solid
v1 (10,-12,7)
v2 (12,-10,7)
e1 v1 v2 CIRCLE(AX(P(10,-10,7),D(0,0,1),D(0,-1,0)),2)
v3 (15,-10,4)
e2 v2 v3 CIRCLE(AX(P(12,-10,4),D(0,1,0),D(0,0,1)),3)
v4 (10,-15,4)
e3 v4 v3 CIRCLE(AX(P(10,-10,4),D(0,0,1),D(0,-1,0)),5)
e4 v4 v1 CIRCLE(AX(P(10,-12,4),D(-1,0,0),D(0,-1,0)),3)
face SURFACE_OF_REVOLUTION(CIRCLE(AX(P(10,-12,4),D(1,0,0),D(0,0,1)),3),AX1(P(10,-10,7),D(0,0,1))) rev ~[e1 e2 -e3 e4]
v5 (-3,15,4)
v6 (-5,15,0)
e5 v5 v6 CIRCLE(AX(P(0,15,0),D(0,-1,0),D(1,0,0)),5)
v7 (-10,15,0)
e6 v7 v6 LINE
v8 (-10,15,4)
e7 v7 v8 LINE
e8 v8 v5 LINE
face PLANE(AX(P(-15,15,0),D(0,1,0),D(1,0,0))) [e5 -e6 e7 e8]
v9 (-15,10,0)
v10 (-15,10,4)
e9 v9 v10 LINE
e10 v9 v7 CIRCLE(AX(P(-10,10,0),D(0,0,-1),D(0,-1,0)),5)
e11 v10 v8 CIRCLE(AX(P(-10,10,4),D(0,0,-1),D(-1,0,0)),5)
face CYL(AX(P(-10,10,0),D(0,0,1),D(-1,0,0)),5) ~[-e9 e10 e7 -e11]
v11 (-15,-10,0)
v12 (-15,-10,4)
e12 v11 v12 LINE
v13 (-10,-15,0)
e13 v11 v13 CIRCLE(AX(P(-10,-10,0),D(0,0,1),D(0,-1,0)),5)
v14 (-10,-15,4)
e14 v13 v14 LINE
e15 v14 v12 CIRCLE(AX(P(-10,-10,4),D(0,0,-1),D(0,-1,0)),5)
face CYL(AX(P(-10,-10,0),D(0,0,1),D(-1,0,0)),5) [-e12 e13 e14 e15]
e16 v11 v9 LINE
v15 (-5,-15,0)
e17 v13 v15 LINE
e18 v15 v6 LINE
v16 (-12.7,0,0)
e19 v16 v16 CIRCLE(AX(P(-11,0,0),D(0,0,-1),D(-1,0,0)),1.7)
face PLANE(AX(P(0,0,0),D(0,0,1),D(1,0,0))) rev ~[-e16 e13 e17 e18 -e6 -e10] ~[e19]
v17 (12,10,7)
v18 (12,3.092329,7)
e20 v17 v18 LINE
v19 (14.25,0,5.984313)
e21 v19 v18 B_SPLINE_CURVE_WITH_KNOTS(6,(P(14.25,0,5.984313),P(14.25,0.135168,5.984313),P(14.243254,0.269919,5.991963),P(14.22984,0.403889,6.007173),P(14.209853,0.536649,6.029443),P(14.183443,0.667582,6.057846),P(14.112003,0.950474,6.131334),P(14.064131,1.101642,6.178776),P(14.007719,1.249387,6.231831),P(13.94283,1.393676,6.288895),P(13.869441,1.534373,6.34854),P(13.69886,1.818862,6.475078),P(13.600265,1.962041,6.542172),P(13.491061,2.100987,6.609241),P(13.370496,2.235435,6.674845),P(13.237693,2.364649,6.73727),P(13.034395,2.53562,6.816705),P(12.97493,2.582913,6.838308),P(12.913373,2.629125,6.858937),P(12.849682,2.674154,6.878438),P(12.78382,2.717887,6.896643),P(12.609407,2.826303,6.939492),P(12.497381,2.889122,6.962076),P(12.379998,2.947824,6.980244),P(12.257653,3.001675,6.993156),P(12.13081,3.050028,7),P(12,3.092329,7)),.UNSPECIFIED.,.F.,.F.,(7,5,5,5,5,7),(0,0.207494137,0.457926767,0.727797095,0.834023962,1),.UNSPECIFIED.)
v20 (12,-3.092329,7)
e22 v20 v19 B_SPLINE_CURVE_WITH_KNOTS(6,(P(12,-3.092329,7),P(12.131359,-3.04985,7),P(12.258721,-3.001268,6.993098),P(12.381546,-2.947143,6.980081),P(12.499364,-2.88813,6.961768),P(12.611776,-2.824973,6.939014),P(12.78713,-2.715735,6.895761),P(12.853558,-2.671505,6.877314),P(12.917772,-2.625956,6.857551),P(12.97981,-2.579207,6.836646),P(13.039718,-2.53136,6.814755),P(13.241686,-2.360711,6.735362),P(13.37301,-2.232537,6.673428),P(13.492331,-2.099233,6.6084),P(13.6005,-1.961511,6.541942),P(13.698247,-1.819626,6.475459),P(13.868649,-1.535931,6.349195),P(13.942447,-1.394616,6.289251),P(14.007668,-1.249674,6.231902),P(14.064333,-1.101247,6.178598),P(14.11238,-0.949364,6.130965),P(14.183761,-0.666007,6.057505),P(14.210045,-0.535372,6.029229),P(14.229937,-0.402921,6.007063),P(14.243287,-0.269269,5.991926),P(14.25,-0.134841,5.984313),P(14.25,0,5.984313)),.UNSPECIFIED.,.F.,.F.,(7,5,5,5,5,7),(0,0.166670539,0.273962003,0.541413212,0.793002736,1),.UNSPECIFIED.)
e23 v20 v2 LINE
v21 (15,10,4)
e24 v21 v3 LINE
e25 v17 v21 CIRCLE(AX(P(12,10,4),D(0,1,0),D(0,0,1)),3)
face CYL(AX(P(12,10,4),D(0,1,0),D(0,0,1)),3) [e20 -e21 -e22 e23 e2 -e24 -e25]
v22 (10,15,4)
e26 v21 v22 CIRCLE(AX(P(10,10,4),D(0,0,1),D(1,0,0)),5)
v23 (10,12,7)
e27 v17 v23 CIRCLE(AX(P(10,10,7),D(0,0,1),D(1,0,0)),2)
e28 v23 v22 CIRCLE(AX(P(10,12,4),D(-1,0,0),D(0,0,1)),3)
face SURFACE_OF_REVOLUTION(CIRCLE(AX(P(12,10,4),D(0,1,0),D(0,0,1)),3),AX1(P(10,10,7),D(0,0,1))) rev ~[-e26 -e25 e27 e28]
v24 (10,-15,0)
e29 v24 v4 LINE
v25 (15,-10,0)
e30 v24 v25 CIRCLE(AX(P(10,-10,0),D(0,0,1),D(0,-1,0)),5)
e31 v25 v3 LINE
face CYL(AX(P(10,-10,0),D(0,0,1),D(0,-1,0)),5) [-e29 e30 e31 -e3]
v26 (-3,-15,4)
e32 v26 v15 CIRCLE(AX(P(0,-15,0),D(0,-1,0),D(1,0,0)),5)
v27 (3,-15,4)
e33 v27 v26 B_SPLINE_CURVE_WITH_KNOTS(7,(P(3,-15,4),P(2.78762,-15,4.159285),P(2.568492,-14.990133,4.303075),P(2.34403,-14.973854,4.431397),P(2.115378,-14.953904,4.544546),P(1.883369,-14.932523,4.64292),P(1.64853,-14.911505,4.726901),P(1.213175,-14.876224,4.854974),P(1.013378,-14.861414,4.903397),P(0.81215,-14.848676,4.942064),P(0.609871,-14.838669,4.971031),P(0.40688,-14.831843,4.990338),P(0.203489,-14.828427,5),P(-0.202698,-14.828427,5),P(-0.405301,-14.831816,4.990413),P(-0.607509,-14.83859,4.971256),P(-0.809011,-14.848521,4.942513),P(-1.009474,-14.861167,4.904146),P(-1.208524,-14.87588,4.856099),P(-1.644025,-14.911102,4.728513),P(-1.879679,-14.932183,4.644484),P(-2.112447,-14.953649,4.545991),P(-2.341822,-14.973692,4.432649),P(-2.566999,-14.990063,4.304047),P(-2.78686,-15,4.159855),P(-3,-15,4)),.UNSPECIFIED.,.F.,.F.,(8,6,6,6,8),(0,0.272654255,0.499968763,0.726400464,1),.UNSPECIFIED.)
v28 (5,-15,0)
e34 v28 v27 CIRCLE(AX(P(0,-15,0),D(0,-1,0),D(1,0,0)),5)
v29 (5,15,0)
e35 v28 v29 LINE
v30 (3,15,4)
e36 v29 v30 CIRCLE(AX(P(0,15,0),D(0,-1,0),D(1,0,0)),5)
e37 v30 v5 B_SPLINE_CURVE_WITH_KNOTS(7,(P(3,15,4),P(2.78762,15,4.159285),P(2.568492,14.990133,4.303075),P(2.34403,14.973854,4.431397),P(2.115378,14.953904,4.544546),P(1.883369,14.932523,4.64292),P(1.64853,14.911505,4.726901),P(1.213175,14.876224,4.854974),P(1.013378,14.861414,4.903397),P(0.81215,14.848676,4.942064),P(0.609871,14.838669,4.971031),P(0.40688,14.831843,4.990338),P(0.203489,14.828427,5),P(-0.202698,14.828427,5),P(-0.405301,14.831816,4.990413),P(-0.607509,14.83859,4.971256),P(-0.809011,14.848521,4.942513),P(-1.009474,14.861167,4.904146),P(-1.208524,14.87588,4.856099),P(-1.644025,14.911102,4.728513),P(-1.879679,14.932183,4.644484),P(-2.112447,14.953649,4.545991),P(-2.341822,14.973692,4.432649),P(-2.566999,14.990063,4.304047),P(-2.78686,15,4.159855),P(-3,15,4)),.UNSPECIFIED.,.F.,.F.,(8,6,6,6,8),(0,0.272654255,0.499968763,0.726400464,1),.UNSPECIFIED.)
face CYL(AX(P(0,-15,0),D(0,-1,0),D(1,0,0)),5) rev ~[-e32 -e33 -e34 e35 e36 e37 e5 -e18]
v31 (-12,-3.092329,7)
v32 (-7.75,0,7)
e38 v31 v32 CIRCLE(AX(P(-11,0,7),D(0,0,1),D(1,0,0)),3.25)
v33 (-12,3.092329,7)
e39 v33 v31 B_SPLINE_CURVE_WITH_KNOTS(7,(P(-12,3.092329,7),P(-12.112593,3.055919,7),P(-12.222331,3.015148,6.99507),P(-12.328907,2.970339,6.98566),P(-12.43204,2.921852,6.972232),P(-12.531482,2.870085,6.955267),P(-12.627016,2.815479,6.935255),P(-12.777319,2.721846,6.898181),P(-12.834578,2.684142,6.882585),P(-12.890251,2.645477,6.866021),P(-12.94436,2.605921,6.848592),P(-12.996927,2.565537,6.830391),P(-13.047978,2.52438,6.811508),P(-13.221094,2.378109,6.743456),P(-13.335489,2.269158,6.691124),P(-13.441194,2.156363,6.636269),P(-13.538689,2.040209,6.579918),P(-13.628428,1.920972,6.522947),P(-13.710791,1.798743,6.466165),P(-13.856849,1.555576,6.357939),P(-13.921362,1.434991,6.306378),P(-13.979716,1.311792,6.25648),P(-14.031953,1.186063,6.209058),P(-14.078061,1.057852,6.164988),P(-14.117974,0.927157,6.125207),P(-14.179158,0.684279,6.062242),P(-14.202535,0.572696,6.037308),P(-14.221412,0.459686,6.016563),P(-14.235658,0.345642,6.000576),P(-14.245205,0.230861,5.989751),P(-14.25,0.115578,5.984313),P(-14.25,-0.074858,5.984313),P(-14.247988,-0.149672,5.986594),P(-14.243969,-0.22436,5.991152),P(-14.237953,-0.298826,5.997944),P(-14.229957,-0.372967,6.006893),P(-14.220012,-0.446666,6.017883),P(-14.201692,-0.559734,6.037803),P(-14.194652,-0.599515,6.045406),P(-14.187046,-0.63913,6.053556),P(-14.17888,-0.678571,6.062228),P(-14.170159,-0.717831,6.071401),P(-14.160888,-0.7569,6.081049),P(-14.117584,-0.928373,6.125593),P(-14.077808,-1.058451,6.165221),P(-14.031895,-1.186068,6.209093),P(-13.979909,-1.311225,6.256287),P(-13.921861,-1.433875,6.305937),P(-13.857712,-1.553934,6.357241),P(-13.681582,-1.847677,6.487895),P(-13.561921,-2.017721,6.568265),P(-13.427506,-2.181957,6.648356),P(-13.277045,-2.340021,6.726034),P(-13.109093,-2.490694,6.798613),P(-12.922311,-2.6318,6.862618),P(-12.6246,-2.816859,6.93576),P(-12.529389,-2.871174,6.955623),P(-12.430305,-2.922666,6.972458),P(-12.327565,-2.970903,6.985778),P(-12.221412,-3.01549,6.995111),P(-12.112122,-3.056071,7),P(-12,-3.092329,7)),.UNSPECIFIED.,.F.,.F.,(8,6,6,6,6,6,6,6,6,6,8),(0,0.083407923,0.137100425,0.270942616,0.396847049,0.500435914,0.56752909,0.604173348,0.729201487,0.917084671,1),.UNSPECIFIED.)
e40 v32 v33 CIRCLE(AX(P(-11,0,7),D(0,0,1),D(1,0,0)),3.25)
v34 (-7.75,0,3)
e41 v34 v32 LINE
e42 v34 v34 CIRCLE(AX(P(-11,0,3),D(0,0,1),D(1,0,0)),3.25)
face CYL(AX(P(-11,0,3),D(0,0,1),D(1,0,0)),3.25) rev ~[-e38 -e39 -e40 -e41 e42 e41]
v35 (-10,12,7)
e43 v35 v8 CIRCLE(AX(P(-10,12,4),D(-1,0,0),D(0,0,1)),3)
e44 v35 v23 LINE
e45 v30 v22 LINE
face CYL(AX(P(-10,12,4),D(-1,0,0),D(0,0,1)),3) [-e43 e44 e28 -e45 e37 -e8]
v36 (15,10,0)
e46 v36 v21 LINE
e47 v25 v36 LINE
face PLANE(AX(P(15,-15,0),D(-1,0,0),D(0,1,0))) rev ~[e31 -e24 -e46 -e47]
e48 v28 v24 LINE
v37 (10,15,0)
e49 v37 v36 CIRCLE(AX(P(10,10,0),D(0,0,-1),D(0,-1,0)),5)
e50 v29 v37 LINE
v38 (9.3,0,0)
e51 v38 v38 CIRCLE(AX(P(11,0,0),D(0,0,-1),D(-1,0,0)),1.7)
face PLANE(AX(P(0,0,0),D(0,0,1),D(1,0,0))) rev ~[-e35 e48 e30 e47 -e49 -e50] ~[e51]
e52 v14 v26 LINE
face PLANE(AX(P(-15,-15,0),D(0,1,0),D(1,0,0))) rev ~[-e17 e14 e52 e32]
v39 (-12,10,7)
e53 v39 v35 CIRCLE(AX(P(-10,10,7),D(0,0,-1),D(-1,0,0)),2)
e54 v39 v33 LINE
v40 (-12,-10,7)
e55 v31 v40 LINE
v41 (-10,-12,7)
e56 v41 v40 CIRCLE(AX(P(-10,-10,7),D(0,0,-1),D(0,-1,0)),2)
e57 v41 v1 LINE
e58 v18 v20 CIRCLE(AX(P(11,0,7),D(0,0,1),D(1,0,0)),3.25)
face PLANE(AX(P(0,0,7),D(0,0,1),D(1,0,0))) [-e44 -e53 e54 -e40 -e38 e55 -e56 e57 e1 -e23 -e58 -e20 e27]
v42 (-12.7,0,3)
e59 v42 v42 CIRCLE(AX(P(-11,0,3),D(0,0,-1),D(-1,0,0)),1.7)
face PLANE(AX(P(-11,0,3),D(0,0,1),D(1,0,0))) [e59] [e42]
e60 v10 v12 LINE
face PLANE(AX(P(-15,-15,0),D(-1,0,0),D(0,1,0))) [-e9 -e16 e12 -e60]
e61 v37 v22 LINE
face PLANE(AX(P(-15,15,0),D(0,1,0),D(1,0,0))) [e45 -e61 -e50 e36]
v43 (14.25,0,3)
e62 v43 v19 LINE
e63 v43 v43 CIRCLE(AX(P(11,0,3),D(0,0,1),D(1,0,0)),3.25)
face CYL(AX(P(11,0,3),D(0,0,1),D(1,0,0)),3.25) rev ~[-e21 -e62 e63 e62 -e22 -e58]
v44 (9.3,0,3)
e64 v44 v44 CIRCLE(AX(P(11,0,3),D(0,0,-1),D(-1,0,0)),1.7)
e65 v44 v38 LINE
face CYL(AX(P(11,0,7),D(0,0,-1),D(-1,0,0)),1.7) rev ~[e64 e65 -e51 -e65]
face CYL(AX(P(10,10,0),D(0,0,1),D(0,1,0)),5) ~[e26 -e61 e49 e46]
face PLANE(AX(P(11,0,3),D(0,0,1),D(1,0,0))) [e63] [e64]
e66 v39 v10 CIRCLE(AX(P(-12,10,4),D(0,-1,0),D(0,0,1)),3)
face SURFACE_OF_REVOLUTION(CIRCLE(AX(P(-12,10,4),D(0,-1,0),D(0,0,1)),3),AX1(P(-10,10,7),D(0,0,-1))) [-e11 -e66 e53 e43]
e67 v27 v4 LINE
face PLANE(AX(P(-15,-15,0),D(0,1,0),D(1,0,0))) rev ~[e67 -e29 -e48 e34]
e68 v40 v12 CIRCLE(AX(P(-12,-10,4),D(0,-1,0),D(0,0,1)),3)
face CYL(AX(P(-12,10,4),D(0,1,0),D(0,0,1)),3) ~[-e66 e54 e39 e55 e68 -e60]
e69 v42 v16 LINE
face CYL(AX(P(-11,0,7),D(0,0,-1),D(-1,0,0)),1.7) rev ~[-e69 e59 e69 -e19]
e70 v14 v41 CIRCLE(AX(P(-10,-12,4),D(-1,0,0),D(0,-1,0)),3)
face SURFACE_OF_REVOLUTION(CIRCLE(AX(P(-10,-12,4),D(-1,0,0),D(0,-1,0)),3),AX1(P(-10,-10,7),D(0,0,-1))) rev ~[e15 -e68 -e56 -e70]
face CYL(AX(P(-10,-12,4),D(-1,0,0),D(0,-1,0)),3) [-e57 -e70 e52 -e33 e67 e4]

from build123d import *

# Parameters (mm, degrees)
F0_W           = 30
F0_H           = 30
F1_DEPTH       = 7
F3_D           = 3.4
F3_CBORE_D     = 6.5
F3_CBORE_DEPTH = 4
F5_DEPTH       = 30
F6_R           = 5
F7_T1_DEPTH    = 20
F7_T3_DEPTH    = 20
F7_T6_ANGLE    = 90
F7_T8_ANGLE    = 90
F7_T10_ANGLE   = 90
F7_T12_ANGLE   = 90


# Not quite as in the source:
# - a fillet or chamfer that OpenCascade refuses, or shapes differently, is made with other operations: its cross-section is extruded or revolved along the edge and cut away or added


with BuildPart() as f1:
    # F0 (on Top) → F1 (new body)
    with BuildSketch(Plane.XY):
        Rectangle(F0_W, F0_H)
    extrude(amount=F1_DEPTH)

    # F3 (through all)
    with Locations(Plane.XY.offset(7)):
        with Locations((-11, 0), (11, 0)):
            CounterBoreHole(F3_D / 2, F3_CBORE_D / 2, F3_CBORE_DEPTH)

    # F4 (on face) → F5 (cut, through all)
    with BuildSketch(Plane.XZ.offset(15)):
        with BuildLine():
            Line((-5, 0), (5, 0))
            ThreePointArc((5, 0), (0, 5), (-5, 0))
        make_face()
    extrude(amount=-F5_DEPTH, mode=Mode.SUBTRACT)

    # F6
    f6_edges = [f1.edges().sort_by_distance(p)[0] for p in [
        (15, -15, 3.5),
        (-15, -15, 3.5),
        (15, 15, 3.5),
        (-15, 15, 3.5),
    ]]
    fillet(f6_edges, radius=F6_R)

    # F7: fillet of radius 3 on 8 edges, made by hand

    # F7_s2 → F7_t1 (cut)
    with BuildSketch(Plane.YZ.offset(-10)):
        with BuildLine():
            ThreePointArc((-15, 4), (-14.1213203436, 6.1213203436), (-12, 7))
            Line((-12, 7), (-15, 7))
            Line((-15, 7), (-15, 4))
        make_face()
        with BuildLine():
            ThreePointArc((12, 7), (14.1213203436, 6.1213203436), (15, 4))
            Line((15, 4), (15, 7))
            Line((15, 7), (12, 7))
        make_face()
    extrude(amount=F7_T1_DEPTH, mode=Mode.SUBTRACT)

    # F7_s4 → F7_t3 (cut)
    with BuildSketch(Plane.XZ.offset(-10)):
        with BuildLine():
            ThreePointArc((-12, 7), (-14.1213203436, 6.1213203436), (-15, 4))
            Line((-15, 4), (-15, 7))
            Line((-15, 7), (-12, 7))
        make_face()
        with BuildLine():
            ThreePointArc((12, 7), (14.1213203436, 6.1213203436), (15, 4))
            Line((15, 4), (15, 7))
            Line((15, 7), (12, 7))
        make_face()
    extrude(amount=F7_T3_DEPTH, mode=Mode.SUBTRACT)

    # F7_s5 → F7_t6 (revolve, cut)
    with BuildSketch(Plane.YZ.offset(-10)):
        with BuildLine():
            ThreePointArc((-15, 4), (-14.1213203436, 6.1213203436), (-12, 7))
            Line((-12, 7), (-15, 7))
            Line((-15, 7), (-15, 4))
        make_face()
    revolve(axis=Axis((-10, -10, 7), (0, 0, -1)), revolution_arc=F7_T6_ANGLE, mode=Mode.SUBTRACT)

    # F7_s7 → F7_t8 (revolve, cut)
    with BuildSketch(Plane.YZ.offset(10)):
        with BuildLine():
            ThreePointArc((-12, 7), (-14.1213203436, 6.1213203436), (-15, 4))
            Line((-15, 4), (-15, 7))
            Line((-15, 7), (-12, 7))
        make_face()
    revolve(axis=Axis((10, -10, 7), (0, 0, 1)), revolution_arc=F7_T8_ANGLE, mode=Mode.SUBTRACT)

    # F7_s9 → F7_t10 (revolve, cut)
    with BuildSketch(Plane.XZ.offset(-10)):
        with BuildLine():
            ThreePointArc((-12, 7), (-14.1213203436, 6.1213203436), (-15, 4))
            Line((-15, 4), (-15, 7))
            Line((-15, 7), (-12, 7))
        make_face()
    revolve(axis=Axis((-10, 10, 7), (0, 0, -1)), revolution_arc=F7_T10_ANGLE, mode=Mode.SUBTRACT)

    # F7_s11 → F7_t12 (revolve, cut)
    with BuildSketch(Plane.XZ.offset(-10)):
        with BuildLine():
            ThreePointArc((12, 7), (14.1213203436, 6.1213203436), (15, 4))
            Line((15, 4), (15, 7))
            Line((15, 7), (12, 7))
        make_face()
    revolve(axis=Axis((10, 10, 7), (0, 0, 1)), revolution_arc=F7_T12_ANGLE, mode=Mode.SUBTRACT)


solid = f1.part
